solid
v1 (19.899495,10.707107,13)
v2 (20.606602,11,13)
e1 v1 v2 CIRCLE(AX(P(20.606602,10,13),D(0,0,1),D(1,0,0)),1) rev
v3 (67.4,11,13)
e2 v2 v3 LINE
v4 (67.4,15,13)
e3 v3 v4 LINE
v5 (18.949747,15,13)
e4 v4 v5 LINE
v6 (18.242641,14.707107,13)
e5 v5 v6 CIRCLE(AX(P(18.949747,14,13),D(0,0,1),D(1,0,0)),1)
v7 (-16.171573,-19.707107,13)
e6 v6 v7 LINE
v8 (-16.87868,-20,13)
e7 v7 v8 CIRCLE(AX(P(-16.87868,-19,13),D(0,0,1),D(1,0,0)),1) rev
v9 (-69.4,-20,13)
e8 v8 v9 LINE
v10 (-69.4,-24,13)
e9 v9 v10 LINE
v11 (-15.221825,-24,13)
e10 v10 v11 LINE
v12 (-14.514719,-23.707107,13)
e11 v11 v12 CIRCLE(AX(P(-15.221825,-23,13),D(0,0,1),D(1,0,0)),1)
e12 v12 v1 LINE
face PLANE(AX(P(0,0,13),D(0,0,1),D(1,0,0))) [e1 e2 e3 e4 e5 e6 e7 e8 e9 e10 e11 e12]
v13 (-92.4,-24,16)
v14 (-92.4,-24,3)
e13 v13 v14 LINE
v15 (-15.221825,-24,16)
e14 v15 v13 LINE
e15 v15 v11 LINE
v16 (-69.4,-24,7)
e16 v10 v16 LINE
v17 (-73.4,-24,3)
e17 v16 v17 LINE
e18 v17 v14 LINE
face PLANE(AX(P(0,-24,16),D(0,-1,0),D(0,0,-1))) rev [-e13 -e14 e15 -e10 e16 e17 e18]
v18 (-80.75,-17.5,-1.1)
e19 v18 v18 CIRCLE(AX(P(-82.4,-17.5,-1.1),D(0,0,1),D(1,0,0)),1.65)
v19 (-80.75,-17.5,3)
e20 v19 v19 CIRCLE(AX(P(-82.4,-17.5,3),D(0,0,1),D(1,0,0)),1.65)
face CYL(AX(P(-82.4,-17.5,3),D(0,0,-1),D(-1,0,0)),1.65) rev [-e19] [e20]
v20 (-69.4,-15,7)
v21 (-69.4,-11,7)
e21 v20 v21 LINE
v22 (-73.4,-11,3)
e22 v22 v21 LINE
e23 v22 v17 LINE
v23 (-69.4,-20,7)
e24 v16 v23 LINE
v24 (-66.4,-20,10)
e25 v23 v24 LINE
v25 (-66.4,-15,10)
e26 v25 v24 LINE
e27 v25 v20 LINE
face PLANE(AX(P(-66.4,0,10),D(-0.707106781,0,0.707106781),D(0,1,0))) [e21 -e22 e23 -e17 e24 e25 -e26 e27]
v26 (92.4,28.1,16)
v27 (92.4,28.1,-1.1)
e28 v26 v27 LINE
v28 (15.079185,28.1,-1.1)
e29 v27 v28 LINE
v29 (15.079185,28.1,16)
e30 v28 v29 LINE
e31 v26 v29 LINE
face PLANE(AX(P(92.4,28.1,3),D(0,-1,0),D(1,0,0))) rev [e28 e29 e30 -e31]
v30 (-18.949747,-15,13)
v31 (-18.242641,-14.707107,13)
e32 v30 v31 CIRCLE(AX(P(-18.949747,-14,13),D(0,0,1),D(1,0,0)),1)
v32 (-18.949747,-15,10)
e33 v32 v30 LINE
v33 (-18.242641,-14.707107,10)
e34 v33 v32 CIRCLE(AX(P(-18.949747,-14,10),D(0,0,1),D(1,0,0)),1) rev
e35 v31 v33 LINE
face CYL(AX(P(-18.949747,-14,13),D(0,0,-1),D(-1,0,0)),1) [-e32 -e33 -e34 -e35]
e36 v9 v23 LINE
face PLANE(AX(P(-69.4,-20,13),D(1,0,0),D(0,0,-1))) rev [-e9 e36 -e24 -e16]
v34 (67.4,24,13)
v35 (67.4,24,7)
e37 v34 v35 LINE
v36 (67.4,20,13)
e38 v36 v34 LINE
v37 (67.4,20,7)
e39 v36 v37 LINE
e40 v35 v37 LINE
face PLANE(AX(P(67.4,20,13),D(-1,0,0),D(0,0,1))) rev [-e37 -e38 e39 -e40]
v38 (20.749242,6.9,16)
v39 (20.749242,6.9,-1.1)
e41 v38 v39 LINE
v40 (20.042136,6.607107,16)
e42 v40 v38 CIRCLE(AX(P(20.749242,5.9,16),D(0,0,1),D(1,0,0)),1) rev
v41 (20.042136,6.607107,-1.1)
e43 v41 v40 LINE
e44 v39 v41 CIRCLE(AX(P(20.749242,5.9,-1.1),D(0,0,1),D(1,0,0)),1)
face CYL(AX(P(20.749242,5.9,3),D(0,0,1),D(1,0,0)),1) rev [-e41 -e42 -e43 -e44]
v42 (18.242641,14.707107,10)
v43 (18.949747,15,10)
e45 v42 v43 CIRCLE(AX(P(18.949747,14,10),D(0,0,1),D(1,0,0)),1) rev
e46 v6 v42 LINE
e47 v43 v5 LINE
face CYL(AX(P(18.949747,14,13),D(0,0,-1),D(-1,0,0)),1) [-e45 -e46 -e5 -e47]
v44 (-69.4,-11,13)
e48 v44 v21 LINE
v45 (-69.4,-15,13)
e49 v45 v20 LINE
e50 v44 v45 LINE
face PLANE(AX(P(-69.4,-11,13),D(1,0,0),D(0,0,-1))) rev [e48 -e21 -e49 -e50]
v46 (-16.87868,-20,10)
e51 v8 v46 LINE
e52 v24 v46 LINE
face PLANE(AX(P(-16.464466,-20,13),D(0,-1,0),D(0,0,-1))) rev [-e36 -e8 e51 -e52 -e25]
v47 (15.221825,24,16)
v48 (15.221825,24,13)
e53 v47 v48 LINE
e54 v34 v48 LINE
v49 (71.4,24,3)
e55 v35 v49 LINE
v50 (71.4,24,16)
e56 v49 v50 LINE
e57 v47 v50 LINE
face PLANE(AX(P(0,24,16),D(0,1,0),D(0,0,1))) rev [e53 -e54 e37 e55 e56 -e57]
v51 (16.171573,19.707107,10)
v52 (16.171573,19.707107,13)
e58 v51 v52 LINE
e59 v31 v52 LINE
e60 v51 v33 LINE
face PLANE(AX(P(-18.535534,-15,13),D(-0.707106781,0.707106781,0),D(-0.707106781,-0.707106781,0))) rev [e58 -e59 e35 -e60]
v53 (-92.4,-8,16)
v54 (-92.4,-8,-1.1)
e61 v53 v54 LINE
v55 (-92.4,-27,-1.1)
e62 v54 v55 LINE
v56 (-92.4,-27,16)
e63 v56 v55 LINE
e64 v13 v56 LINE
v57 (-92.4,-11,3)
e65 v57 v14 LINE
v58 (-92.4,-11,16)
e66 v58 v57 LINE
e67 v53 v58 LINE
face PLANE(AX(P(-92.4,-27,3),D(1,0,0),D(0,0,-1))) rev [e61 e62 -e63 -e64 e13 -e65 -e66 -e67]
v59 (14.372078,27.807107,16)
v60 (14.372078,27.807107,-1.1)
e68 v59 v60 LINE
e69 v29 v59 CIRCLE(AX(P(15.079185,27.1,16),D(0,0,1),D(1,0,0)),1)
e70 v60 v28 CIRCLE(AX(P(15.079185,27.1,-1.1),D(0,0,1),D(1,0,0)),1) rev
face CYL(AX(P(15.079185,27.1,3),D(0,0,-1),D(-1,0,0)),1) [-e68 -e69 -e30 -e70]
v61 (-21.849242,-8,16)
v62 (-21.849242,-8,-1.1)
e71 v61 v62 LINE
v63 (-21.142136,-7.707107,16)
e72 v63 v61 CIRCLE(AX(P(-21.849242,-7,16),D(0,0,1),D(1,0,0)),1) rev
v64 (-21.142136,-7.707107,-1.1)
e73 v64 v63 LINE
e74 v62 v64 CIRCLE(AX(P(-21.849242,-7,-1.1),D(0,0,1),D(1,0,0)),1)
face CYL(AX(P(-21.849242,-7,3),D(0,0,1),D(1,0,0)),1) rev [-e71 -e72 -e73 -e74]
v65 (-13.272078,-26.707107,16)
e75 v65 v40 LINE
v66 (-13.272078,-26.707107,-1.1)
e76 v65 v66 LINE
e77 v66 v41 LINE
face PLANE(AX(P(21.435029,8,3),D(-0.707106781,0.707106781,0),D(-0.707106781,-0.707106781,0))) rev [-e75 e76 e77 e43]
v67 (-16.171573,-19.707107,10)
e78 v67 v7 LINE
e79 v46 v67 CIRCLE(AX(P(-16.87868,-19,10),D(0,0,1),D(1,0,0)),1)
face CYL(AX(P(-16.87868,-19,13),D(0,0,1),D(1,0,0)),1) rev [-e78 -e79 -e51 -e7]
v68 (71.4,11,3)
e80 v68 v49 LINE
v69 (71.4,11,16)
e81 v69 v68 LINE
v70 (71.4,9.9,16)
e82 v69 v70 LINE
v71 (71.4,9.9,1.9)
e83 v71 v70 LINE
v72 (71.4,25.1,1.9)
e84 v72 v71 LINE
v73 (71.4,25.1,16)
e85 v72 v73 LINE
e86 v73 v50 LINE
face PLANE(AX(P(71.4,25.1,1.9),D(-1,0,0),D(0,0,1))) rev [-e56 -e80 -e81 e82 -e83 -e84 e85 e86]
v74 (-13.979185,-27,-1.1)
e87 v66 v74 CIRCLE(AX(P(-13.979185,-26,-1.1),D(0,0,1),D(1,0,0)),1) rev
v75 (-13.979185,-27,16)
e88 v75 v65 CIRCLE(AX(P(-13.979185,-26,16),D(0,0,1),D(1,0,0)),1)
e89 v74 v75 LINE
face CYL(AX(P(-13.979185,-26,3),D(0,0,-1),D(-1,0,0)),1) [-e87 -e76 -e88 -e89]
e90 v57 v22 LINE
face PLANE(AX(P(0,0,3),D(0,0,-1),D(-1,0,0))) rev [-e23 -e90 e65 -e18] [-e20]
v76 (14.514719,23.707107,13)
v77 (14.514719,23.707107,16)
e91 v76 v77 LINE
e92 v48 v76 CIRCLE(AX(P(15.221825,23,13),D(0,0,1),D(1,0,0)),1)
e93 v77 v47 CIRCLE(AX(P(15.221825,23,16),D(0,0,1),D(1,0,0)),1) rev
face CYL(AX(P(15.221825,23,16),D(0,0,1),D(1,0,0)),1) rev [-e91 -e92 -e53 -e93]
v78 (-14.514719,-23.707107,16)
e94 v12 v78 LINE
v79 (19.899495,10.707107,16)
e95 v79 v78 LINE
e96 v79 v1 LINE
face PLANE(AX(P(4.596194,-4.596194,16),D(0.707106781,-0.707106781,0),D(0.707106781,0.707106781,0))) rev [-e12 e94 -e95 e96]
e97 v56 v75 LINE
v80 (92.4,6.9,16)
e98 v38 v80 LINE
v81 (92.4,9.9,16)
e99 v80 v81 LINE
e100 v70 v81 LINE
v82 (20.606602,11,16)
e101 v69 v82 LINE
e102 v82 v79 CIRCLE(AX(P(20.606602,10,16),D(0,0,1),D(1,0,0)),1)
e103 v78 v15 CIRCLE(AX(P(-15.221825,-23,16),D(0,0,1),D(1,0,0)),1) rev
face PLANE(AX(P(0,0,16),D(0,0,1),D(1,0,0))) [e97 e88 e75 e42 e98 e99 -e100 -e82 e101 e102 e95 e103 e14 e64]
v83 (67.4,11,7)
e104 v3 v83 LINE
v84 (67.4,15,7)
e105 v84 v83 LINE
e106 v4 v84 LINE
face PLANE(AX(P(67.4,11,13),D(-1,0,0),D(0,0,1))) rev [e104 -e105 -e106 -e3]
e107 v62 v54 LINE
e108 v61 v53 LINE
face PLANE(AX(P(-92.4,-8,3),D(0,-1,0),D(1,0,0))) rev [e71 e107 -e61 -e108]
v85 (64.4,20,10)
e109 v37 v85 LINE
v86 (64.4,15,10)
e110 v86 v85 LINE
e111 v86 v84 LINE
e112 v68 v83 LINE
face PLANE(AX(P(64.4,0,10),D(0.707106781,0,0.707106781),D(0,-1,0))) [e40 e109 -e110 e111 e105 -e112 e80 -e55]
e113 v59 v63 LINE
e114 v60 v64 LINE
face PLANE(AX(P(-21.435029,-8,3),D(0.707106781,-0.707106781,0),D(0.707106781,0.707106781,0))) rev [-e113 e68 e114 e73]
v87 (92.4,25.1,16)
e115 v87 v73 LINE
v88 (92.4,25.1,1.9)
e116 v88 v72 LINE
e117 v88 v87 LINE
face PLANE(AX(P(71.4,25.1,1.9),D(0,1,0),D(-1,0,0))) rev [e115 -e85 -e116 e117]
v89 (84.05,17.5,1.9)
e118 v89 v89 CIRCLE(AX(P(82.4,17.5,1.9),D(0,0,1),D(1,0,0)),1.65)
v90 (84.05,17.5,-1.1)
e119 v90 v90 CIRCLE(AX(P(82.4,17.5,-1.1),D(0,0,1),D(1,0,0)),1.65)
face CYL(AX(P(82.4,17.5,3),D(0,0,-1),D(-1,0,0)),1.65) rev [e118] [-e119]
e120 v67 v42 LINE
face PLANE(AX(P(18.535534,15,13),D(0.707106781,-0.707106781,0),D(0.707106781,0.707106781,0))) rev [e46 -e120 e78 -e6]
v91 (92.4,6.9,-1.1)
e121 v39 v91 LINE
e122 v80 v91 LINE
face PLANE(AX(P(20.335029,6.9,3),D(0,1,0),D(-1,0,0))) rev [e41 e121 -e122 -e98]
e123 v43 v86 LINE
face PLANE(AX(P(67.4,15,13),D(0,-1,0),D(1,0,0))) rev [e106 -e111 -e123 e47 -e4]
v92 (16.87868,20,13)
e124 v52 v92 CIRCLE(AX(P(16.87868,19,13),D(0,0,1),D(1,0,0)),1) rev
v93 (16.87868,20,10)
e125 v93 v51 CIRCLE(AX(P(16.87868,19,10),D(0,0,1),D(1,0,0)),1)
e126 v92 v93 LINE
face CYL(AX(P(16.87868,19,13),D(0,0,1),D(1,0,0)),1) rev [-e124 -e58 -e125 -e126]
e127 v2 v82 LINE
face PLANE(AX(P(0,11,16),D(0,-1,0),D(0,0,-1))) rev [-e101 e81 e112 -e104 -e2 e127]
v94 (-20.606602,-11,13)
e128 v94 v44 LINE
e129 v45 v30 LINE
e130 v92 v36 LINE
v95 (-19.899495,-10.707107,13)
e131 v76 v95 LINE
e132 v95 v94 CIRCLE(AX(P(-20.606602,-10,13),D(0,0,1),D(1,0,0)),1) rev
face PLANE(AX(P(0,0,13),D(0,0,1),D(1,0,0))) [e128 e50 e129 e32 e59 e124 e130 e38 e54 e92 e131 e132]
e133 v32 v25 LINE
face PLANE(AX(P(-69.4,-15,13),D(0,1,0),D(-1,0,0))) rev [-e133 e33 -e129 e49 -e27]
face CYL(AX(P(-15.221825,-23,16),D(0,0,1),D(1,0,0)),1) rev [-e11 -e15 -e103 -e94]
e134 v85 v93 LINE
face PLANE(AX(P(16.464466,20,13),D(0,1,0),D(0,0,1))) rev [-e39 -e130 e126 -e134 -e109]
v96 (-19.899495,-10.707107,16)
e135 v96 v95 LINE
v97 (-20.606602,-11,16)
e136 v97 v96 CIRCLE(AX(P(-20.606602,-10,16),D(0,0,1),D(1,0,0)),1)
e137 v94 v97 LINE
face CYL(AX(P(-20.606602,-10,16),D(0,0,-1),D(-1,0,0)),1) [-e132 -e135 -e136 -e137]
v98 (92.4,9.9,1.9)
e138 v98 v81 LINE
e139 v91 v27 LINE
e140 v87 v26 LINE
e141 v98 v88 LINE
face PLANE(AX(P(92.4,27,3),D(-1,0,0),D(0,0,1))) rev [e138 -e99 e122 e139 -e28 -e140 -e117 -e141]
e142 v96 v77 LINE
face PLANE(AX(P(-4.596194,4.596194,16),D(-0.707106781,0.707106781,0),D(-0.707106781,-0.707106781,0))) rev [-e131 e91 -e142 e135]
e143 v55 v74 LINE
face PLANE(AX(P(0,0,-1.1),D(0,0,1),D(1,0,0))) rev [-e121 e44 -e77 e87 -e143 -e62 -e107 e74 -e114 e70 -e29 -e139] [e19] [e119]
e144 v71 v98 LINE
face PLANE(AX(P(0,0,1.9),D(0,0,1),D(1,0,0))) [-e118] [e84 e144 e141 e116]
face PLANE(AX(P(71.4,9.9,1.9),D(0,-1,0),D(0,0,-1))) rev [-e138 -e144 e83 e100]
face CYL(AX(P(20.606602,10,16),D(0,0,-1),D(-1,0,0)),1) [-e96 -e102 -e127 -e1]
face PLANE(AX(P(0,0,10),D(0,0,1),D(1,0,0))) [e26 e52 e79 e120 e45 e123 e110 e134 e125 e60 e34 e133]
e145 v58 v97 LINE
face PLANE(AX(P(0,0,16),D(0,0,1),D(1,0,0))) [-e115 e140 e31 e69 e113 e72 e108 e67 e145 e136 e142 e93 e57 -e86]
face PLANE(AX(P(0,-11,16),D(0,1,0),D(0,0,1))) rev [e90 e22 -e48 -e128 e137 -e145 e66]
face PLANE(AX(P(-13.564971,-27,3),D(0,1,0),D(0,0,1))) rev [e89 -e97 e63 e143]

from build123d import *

# Parameters (mm, degrees)
SKETCH_10_R         = 1.65
EXTRUDE_1_DEPTH     = 3
EXTRUDE_START       = 3
EXTRUDE_2_DEPTH     = 7
EXTRUDE_3_DEPTH     = 13
CHAMFER_1_SIZE      = 7
EXTRUDE_5_DEPTH     = 10
EXTRUDE_START_2     = -1.1
SKETCH_16_R         = 1.65
EXTRUDE_6_DEPTH     = 4.1
EXTRUDE_7_DEPTH     = 16
SKETCH_18_W         = 21
SKETCH_18_H         = 15.2
CUT_EXTRUDE_1_DEPTH = 14.1
FILLET_1_R          = 1


with BuildPart() as part:
    # 草图10 → 凸台-拉伸1 (new body)
    with BuildSketch(Plane.XY):
        Polygon((-92.4, -8), (-21.435028843, -8), (13.564971157, 27), (92.4, 27), (92.4, 8), (21.435028843, 8), (-13.564971157, -27), (-92.4, -27), align=None)
        with Locations((-82.4, -17.5)):
            Circle(SKETCH_10_R, mode=Mode.SUBTRACT)
        with Locations((82.4, 17.5)):
            Circle(SKETCH_10_R, mode=Mode.SUBTRACT)
    extrude(amount=EXTRUDE_1_DEPTH)

    # 草图11 → 凸台-拉伸2 (add)
    with BuildSketch(Plane.XY.offset(EXTRUDE_START)):
        Polygon((-73.4, -8), (-73.4, -27), (-13.564971157, -27), (21.435028843, 8), (71.4, 8), (71.4, 27), (13.564971157, 27), (-21.435028843, -8), align=None)
    extrude(amount=EXTRUDE_2_DEPTH)

    # 草图12 → 凸台-拉伸3 (add)
    with BuildSketch(Plane.XY.offset(EXTRUDE_START)):
        Polygon((-92.4, -8), (-21.435028843, -8), (13.564971157, 27), (92.4, 27), (92.4, 24), (14.807611845, 24), (-20.192388155, -11), (-92.4, -11), align=None)
        Polygon((-92.4, -24), (-92.4, -27), (-13.564971157, -27), (21.435028843, 8), (92.4, 8), (92.4, 11), (20.192388155, 11), (-14.807611845, -24), align=None)
    extrude(amount=EXTRUDE_3_DEPTH)

    # 倒角1
    chamfer_1_edges = [part.edges().sort_by_distance(p)[0] for p in [
        (71.4, 17.5, 10),
        (-73.4, -17.5, 10),
    ]]
    chamfer(chamfer_1_edges, length=CHAMFER_1_SIZE - 0.0001)  # a hair under: the kernel refuses the full size

    # 草图15 → 凸台-拉伸5 (add)
    with BuildSketch(Plane.XY.offset(3)):
        Polygon((-69.4, -11), (-69.4, -15), (-18.535533906, -15), (16.464466094, 20), (67.4, 20), (67.4, 24), (14.807611845, 24), (-20.192388155, -11), align=None)
        Polygon((-69.4, -20), (-69.4, -24), (-14.807611845, -24), (20.192388155, 11), (67.4, 11), (67.4, 15), (18.535533906, 15), (-16.464466094, -20), align=None)
    extrude(amount=EXTRUDE_5_DEPTH)

    # 草图16 → 凸台-拉伸6 (add)
    with BuildSketch(Plane.XY.offset(EXTRUDE_START_2)):
        Polygon((-92.4, -8), (-92.4, -27), (-13.564971157, -27), (20.335028843, 6.9), (92.4, 6.9), (92.4, 28.1), (14.664971157, 28.1), (-21.435028843, -8), align=None)
        with Locations((-82.4, -17.5)):
            Circle(SKETCH_16_R, mode=Mode.SUBTRACT)
        with Locations((82.4, 17.5)):
            Circle(SKETCH_16_R, mode=Mode.SUBTRACT)
    extrude(amount=EXTRUDE_6_DEPTH)

    # 草图17 → 凸台-拉伸7 (add)
    with BuildSketch(Plane.XY):
        Polygon((92.4, 28.1), (92.4, 24), (14.807611845, 24), (12.686291501, 26.121320344), (14.664971157, 28.1), align=None)
        Polygon((92.4, 6.9), (20.335028843, 6.9), (18.213708499, 9.021320344), (20.192388155, 11), (92.4, 11), align=None)
    extrude(amount=EXTRUDE_7_DEPTH)

    # 草图18 → 切除-拉伸1 (cut)
    with BuildSketch(Plane.XY.offset(16)):
        with Locations((81.9, 17.5)):
            Rectangle(SKETCH_18_W, SKETCH_18_H)
    extrude(amount=-CUT_EXTRUDE_1_DEPTH, mode=Mode.SUBTRACT)


with BuildPart() as cut_extrude_1_kept_piece:
    # of the separate pieces the step leaves, the one the design keeps (cut_extrude_1_pieces_kept)
    add(part.part.solids().sort_by_distance((-73.4, -24, 3.0001))[0])

    # 圆角1
    fillet_1_edges = [cut_extrude_1_kept_piece.edges().sort_by_distance(p)[0] for p in [
        (-21.435028843, -8, 7.45),
        (-13.564971157, -27, 7.45),
        (-18.535533906, -15, 11.5),
        (16.464466094, 20, 11.5),
        (-16.464466094, -20, 11.5),
        (18.535533906, 15, 11.5),
        (20.335028843, 6.9, 7.45),
        (14.664971157, 28.1, 7.45),
        (14.807611845, 24, 14.5),
        (-20.192388155, -11, 14.5),
        (-14.807611845, -24, 14.5),
        (20.192388155, 11, 14.5),
    ]]
    fillet(fillet_1_edges, radius=FILLET_1_R)


solid = cut_extrude_1_kept_piece.part
